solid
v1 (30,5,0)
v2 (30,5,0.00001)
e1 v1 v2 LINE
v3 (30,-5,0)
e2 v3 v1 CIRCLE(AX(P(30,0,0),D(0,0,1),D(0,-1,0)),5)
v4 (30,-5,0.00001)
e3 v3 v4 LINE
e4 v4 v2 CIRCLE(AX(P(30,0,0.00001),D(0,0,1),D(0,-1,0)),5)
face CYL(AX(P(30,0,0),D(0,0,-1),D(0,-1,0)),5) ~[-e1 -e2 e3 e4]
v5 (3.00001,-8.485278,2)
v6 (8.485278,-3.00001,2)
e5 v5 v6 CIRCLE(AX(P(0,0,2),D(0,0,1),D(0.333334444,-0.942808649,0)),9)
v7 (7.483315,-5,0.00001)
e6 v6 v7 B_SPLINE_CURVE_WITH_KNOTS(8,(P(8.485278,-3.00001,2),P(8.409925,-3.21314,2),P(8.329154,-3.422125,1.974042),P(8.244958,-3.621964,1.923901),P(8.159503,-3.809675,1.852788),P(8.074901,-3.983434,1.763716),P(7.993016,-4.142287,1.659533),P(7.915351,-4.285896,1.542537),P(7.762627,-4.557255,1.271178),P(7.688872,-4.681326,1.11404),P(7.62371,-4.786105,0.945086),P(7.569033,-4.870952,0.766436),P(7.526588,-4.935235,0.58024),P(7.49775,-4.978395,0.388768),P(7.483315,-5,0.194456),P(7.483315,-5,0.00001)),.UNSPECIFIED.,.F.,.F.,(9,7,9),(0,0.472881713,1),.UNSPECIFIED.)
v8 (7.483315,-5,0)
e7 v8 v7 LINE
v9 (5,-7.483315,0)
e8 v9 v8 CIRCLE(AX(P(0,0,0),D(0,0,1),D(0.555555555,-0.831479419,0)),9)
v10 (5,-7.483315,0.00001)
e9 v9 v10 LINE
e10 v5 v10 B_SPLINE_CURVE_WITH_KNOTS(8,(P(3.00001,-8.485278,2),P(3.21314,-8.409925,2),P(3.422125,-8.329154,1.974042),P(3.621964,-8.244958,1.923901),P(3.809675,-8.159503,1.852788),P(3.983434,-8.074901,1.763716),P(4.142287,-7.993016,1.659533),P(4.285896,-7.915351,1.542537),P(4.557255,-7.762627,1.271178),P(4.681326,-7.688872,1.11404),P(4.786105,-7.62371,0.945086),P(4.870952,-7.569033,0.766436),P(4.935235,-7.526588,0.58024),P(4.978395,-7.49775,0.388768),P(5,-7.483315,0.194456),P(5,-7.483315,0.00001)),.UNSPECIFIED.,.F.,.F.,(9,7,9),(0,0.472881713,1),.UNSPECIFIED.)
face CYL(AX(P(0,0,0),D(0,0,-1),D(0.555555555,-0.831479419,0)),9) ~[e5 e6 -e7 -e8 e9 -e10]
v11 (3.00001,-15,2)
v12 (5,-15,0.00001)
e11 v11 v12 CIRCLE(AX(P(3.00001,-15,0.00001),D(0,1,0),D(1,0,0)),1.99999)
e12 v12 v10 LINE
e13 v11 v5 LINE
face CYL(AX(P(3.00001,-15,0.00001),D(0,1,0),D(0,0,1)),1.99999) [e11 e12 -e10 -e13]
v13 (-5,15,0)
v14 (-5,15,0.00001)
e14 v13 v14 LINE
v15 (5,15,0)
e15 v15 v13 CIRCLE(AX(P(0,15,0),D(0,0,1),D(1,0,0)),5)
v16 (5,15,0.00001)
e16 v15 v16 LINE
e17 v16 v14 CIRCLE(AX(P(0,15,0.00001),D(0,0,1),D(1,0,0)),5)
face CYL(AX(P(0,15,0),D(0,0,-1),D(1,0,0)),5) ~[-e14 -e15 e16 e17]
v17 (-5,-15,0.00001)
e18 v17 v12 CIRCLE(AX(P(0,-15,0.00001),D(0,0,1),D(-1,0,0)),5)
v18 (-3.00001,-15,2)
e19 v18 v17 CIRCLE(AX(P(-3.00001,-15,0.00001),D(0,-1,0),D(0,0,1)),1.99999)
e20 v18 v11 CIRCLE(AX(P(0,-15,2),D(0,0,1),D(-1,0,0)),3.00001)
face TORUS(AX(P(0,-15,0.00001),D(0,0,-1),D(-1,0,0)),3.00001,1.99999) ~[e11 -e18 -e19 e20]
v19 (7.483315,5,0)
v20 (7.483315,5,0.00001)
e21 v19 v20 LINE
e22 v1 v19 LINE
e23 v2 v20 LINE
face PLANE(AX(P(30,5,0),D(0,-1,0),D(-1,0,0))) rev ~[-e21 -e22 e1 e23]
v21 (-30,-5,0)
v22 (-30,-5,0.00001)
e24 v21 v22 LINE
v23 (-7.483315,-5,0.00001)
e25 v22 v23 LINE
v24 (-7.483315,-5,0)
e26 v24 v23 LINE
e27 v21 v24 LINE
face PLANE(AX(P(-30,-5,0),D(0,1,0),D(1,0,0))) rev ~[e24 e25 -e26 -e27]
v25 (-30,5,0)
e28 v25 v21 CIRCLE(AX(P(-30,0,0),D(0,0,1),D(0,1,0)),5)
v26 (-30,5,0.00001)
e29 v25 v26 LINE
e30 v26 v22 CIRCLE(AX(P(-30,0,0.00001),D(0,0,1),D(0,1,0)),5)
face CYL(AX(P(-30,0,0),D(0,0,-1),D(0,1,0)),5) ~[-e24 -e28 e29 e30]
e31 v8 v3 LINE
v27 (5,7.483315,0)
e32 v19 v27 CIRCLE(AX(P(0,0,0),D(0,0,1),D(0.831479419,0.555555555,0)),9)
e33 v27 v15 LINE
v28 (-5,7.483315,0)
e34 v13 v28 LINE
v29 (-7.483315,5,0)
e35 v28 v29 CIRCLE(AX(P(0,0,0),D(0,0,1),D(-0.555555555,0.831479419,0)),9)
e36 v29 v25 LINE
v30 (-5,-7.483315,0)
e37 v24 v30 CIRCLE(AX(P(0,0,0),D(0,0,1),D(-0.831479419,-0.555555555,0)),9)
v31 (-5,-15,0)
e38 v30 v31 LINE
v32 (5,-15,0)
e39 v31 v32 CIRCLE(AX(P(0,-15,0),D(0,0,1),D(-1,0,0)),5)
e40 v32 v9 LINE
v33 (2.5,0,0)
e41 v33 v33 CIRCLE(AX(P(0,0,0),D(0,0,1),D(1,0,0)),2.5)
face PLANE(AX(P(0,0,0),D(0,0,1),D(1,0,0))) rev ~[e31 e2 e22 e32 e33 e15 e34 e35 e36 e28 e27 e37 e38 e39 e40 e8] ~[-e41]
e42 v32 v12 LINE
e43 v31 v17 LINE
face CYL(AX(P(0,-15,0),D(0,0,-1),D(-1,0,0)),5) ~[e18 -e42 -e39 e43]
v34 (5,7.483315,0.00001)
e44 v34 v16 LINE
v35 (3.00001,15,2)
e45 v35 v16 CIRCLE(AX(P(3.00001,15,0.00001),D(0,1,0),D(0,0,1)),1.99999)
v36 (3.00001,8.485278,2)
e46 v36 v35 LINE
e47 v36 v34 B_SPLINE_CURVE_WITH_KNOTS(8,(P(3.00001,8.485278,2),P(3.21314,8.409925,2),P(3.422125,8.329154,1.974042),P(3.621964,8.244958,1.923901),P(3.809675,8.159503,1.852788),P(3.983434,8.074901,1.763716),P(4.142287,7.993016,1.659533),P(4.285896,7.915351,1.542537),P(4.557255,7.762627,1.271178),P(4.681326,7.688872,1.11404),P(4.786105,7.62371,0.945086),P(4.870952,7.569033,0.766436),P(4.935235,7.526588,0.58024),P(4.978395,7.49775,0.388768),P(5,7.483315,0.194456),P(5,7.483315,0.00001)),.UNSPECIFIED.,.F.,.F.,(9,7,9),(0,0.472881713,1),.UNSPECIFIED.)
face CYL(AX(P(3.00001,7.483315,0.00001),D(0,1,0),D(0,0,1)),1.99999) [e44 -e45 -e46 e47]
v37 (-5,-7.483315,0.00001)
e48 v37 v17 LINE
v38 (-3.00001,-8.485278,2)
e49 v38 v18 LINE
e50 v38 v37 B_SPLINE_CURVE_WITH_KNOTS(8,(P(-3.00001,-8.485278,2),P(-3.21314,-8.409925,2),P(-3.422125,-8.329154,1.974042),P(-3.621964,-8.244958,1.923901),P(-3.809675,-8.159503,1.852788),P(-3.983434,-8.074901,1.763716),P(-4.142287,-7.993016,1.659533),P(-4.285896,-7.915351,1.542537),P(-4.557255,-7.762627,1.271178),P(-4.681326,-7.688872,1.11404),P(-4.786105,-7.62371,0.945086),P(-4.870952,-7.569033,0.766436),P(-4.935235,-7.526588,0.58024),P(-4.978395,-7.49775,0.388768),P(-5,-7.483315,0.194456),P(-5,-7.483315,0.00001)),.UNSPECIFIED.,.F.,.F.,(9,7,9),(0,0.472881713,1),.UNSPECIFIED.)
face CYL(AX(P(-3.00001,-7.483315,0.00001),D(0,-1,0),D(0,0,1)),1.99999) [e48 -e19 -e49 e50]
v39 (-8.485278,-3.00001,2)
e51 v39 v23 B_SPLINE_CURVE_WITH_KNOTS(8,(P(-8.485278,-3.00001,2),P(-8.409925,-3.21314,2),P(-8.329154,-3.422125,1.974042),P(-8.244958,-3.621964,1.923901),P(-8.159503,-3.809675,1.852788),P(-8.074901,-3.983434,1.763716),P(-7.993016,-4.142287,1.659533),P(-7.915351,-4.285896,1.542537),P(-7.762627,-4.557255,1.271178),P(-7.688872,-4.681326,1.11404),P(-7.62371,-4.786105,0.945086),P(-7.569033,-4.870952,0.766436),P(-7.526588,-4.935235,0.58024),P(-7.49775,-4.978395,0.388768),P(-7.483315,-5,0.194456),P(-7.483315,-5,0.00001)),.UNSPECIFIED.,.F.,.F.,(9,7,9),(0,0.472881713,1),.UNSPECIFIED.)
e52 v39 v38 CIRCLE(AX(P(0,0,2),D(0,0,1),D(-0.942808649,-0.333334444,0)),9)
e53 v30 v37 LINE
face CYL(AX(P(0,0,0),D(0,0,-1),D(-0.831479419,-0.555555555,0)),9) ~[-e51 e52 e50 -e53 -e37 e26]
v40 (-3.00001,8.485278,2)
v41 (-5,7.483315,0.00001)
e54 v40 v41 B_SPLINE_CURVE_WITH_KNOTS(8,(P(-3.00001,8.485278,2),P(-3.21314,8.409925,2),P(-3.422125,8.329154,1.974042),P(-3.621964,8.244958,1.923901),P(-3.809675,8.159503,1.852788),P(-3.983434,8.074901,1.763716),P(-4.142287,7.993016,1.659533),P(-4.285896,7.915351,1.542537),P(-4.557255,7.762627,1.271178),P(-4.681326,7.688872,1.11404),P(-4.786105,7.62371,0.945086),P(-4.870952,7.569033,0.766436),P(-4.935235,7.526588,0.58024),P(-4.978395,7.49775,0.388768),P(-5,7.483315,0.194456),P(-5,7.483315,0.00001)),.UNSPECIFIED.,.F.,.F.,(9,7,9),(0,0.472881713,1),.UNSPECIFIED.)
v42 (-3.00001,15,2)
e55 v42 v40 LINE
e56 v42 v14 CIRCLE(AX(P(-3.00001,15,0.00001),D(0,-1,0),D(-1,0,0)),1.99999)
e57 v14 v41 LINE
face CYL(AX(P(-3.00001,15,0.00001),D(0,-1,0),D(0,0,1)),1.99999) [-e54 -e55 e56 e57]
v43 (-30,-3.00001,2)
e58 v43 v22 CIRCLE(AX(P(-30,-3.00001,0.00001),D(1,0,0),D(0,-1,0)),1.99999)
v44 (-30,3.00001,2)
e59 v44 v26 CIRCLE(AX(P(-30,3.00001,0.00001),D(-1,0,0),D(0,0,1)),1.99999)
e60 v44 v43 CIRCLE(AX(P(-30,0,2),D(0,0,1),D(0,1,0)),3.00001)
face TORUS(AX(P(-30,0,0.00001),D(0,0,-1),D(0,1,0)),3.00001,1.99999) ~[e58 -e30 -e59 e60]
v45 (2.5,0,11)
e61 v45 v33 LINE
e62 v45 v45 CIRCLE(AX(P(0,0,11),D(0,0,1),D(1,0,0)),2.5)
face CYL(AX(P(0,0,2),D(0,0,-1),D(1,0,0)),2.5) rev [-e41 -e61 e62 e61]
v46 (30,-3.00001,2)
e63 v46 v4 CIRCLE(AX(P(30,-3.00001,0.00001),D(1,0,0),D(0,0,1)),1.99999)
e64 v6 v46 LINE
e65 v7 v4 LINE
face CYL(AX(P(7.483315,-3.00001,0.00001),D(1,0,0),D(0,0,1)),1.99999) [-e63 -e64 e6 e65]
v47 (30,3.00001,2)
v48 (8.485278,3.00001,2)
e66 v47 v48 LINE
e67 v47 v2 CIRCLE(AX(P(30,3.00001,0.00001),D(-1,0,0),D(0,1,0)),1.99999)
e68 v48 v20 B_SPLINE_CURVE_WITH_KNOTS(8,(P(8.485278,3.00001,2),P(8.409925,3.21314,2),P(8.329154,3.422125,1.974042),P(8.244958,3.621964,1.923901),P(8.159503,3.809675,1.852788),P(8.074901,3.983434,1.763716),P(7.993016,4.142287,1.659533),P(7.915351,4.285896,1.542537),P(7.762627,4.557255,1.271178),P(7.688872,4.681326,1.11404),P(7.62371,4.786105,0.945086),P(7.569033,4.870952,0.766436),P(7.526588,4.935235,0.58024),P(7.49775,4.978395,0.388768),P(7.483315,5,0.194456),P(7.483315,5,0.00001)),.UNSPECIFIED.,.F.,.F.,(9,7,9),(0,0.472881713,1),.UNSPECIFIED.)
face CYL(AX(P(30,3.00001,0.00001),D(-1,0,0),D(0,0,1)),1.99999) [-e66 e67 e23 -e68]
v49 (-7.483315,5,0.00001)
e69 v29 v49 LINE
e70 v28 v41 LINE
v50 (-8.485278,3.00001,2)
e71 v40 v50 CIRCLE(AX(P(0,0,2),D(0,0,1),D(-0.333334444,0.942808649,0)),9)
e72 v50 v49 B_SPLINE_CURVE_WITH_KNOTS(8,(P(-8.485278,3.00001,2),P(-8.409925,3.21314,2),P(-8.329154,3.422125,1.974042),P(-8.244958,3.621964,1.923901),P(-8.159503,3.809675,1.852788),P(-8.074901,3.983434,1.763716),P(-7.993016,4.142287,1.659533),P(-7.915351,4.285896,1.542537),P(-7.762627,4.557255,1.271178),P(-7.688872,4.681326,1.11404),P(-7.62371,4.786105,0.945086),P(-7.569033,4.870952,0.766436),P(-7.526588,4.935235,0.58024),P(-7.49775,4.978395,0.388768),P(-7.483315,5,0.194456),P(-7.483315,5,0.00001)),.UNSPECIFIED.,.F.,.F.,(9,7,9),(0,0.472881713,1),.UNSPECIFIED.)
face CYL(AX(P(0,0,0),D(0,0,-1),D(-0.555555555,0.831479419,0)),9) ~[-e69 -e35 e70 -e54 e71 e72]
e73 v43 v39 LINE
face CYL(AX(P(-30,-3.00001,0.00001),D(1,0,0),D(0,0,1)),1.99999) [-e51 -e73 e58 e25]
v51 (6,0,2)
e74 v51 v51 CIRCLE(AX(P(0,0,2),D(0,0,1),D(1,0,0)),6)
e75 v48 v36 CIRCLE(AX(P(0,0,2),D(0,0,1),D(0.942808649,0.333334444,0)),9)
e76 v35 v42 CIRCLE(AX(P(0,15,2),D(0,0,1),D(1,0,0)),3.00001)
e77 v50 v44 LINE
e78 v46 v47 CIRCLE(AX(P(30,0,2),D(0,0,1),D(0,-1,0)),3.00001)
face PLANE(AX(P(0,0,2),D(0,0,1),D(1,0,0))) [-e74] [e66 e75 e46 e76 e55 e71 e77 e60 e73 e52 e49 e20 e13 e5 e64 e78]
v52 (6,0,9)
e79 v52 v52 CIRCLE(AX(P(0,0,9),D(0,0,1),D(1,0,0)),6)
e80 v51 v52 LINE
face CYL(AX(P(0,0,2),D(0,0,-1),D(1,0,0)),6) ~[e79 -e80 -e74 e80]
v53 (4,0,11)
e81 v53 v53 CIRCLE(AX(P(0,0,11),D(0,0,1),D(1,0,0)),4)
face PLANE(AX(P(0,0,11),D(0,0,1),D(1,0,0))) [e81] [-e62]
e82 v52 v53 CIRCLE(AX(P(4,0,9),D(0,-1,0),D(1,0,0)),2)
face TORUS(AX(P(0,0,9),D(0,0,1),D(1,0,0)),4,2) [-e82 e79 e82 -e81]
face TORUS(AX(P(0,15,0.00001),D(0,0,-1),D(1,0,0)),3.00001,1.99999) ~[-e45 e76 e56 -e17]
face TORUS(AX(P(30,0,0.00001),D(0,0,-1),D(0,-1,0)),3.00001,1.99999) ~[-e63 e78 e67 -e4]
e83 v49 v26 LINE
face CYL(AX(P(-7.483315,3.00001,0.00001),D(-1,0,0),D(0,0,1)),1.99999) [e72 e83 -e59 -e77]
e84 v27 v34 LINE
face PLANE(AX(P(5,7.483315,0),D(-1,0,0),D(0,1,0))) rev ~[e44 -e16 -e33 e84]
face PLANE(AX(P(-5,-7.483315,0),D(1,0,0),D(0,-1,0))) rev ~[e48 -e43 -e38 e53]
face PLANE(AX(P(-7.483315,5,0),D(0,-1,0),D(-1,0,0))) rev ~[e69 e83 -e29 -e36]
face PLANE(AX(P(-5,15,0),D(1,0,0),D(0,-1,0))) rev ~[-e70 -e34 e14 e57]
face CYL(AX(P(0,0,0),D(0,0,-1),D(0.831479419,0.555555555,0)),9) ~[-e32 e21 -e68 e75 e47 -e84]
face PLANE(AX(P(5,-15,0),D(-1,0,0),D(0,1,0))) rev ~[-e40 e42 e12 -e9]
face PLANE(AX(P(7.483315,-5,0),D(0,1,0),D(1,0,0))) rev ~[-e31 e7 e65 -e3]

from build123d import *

# Parameters (mm, degrees)
F0_R     = 2.5
F1_DEPTH = 2
F2_R     = 6
F2_R_2   = 2.5
F3_DEPTH = 9
F4_R     = 2
F5_R     = 1.99999


# Not quite as in the source:
# - a fillet or chamfer is up to 0.001 mm smaller than in the source, because OpenCascade refuses the exact size


with BuildPart() as f1:
    # F0 (on Top) → F1 (new body)
    with BuildSketch(Plane.XY):
        with BuildLine():
            Line((-30, -5), (-7.4833147735, -5))
            ThreePointArc((-7.4833147735, -5), (-6.3639610307, -6.3639610307), (-5, -7.4833147735))
            Line((-5, -7.4833147735), (-5, -15))
            ThreePointArc((-5, -15), (0, -20), (5, -15))
            Line((5, -15), (5, -7.4833147735))
            ThreePointArc((5, -7.4833147735), (6.3639610307, -6.3639610307), (7.4833147735, -5))
            Line((7.4833147735, -5), (30, -5))
            ThreePointArc((30, -5), (35, 0), (30, 5))
            Line((30, 5), (7.4833147735, 5))
            ThreePointArc((7.4833147735, 5), (6.3639610307, 6.3639610307), (5, 7.4833147735))
            Line((5, 7.4833147735), (5, 15))
            ThreePointArc((5, 15), (0, 20), (-5, 15))
            Line((-5, 15), (-5, 7.4833147735))
            ThreePointArc((-5, 7.4833147735), (-6.3639610307, 6.3639610307), (-7.4833147735, 5))
            Line((-7.4833147735, 5), (-30, 5))
            ThreePointArc((-30, 5), (-35, 0), (-30, -5))
        make_face()
        Circle(F0_R, mode=Mode.SUBTRACT)
    extrude(amount=F1_DEPTH)

    # F2 (on face) → F3 (join)
    with BuildSketch(Plane.XY.offset(2)):
        Circle(F2_R)
        Circle(F2_R_2, mode=Mode.SUBTRACT)
    extrude(amount=F3_DEPTH)

    # F4
    f4_edges = [f1.edges().sort_by_distance(p)[0] for p in [
        (-6, 0, 11),
    ]]
    fillet(f4_edges, radius=F4_R)

    # F5 (radius 2 in the source; OpenCascade refuses exactly that, so slightly less here)
    f5_edges = [f1.edges().sort_by_distance(p)[0] for p in [
        (35, 0, 2),
        (0, 20, 2),
        (0, -20, 2),
        (-35, 0, 2),
    ]]
    fillet(f5_edges, radius=F5_R)


solid = f1.part
